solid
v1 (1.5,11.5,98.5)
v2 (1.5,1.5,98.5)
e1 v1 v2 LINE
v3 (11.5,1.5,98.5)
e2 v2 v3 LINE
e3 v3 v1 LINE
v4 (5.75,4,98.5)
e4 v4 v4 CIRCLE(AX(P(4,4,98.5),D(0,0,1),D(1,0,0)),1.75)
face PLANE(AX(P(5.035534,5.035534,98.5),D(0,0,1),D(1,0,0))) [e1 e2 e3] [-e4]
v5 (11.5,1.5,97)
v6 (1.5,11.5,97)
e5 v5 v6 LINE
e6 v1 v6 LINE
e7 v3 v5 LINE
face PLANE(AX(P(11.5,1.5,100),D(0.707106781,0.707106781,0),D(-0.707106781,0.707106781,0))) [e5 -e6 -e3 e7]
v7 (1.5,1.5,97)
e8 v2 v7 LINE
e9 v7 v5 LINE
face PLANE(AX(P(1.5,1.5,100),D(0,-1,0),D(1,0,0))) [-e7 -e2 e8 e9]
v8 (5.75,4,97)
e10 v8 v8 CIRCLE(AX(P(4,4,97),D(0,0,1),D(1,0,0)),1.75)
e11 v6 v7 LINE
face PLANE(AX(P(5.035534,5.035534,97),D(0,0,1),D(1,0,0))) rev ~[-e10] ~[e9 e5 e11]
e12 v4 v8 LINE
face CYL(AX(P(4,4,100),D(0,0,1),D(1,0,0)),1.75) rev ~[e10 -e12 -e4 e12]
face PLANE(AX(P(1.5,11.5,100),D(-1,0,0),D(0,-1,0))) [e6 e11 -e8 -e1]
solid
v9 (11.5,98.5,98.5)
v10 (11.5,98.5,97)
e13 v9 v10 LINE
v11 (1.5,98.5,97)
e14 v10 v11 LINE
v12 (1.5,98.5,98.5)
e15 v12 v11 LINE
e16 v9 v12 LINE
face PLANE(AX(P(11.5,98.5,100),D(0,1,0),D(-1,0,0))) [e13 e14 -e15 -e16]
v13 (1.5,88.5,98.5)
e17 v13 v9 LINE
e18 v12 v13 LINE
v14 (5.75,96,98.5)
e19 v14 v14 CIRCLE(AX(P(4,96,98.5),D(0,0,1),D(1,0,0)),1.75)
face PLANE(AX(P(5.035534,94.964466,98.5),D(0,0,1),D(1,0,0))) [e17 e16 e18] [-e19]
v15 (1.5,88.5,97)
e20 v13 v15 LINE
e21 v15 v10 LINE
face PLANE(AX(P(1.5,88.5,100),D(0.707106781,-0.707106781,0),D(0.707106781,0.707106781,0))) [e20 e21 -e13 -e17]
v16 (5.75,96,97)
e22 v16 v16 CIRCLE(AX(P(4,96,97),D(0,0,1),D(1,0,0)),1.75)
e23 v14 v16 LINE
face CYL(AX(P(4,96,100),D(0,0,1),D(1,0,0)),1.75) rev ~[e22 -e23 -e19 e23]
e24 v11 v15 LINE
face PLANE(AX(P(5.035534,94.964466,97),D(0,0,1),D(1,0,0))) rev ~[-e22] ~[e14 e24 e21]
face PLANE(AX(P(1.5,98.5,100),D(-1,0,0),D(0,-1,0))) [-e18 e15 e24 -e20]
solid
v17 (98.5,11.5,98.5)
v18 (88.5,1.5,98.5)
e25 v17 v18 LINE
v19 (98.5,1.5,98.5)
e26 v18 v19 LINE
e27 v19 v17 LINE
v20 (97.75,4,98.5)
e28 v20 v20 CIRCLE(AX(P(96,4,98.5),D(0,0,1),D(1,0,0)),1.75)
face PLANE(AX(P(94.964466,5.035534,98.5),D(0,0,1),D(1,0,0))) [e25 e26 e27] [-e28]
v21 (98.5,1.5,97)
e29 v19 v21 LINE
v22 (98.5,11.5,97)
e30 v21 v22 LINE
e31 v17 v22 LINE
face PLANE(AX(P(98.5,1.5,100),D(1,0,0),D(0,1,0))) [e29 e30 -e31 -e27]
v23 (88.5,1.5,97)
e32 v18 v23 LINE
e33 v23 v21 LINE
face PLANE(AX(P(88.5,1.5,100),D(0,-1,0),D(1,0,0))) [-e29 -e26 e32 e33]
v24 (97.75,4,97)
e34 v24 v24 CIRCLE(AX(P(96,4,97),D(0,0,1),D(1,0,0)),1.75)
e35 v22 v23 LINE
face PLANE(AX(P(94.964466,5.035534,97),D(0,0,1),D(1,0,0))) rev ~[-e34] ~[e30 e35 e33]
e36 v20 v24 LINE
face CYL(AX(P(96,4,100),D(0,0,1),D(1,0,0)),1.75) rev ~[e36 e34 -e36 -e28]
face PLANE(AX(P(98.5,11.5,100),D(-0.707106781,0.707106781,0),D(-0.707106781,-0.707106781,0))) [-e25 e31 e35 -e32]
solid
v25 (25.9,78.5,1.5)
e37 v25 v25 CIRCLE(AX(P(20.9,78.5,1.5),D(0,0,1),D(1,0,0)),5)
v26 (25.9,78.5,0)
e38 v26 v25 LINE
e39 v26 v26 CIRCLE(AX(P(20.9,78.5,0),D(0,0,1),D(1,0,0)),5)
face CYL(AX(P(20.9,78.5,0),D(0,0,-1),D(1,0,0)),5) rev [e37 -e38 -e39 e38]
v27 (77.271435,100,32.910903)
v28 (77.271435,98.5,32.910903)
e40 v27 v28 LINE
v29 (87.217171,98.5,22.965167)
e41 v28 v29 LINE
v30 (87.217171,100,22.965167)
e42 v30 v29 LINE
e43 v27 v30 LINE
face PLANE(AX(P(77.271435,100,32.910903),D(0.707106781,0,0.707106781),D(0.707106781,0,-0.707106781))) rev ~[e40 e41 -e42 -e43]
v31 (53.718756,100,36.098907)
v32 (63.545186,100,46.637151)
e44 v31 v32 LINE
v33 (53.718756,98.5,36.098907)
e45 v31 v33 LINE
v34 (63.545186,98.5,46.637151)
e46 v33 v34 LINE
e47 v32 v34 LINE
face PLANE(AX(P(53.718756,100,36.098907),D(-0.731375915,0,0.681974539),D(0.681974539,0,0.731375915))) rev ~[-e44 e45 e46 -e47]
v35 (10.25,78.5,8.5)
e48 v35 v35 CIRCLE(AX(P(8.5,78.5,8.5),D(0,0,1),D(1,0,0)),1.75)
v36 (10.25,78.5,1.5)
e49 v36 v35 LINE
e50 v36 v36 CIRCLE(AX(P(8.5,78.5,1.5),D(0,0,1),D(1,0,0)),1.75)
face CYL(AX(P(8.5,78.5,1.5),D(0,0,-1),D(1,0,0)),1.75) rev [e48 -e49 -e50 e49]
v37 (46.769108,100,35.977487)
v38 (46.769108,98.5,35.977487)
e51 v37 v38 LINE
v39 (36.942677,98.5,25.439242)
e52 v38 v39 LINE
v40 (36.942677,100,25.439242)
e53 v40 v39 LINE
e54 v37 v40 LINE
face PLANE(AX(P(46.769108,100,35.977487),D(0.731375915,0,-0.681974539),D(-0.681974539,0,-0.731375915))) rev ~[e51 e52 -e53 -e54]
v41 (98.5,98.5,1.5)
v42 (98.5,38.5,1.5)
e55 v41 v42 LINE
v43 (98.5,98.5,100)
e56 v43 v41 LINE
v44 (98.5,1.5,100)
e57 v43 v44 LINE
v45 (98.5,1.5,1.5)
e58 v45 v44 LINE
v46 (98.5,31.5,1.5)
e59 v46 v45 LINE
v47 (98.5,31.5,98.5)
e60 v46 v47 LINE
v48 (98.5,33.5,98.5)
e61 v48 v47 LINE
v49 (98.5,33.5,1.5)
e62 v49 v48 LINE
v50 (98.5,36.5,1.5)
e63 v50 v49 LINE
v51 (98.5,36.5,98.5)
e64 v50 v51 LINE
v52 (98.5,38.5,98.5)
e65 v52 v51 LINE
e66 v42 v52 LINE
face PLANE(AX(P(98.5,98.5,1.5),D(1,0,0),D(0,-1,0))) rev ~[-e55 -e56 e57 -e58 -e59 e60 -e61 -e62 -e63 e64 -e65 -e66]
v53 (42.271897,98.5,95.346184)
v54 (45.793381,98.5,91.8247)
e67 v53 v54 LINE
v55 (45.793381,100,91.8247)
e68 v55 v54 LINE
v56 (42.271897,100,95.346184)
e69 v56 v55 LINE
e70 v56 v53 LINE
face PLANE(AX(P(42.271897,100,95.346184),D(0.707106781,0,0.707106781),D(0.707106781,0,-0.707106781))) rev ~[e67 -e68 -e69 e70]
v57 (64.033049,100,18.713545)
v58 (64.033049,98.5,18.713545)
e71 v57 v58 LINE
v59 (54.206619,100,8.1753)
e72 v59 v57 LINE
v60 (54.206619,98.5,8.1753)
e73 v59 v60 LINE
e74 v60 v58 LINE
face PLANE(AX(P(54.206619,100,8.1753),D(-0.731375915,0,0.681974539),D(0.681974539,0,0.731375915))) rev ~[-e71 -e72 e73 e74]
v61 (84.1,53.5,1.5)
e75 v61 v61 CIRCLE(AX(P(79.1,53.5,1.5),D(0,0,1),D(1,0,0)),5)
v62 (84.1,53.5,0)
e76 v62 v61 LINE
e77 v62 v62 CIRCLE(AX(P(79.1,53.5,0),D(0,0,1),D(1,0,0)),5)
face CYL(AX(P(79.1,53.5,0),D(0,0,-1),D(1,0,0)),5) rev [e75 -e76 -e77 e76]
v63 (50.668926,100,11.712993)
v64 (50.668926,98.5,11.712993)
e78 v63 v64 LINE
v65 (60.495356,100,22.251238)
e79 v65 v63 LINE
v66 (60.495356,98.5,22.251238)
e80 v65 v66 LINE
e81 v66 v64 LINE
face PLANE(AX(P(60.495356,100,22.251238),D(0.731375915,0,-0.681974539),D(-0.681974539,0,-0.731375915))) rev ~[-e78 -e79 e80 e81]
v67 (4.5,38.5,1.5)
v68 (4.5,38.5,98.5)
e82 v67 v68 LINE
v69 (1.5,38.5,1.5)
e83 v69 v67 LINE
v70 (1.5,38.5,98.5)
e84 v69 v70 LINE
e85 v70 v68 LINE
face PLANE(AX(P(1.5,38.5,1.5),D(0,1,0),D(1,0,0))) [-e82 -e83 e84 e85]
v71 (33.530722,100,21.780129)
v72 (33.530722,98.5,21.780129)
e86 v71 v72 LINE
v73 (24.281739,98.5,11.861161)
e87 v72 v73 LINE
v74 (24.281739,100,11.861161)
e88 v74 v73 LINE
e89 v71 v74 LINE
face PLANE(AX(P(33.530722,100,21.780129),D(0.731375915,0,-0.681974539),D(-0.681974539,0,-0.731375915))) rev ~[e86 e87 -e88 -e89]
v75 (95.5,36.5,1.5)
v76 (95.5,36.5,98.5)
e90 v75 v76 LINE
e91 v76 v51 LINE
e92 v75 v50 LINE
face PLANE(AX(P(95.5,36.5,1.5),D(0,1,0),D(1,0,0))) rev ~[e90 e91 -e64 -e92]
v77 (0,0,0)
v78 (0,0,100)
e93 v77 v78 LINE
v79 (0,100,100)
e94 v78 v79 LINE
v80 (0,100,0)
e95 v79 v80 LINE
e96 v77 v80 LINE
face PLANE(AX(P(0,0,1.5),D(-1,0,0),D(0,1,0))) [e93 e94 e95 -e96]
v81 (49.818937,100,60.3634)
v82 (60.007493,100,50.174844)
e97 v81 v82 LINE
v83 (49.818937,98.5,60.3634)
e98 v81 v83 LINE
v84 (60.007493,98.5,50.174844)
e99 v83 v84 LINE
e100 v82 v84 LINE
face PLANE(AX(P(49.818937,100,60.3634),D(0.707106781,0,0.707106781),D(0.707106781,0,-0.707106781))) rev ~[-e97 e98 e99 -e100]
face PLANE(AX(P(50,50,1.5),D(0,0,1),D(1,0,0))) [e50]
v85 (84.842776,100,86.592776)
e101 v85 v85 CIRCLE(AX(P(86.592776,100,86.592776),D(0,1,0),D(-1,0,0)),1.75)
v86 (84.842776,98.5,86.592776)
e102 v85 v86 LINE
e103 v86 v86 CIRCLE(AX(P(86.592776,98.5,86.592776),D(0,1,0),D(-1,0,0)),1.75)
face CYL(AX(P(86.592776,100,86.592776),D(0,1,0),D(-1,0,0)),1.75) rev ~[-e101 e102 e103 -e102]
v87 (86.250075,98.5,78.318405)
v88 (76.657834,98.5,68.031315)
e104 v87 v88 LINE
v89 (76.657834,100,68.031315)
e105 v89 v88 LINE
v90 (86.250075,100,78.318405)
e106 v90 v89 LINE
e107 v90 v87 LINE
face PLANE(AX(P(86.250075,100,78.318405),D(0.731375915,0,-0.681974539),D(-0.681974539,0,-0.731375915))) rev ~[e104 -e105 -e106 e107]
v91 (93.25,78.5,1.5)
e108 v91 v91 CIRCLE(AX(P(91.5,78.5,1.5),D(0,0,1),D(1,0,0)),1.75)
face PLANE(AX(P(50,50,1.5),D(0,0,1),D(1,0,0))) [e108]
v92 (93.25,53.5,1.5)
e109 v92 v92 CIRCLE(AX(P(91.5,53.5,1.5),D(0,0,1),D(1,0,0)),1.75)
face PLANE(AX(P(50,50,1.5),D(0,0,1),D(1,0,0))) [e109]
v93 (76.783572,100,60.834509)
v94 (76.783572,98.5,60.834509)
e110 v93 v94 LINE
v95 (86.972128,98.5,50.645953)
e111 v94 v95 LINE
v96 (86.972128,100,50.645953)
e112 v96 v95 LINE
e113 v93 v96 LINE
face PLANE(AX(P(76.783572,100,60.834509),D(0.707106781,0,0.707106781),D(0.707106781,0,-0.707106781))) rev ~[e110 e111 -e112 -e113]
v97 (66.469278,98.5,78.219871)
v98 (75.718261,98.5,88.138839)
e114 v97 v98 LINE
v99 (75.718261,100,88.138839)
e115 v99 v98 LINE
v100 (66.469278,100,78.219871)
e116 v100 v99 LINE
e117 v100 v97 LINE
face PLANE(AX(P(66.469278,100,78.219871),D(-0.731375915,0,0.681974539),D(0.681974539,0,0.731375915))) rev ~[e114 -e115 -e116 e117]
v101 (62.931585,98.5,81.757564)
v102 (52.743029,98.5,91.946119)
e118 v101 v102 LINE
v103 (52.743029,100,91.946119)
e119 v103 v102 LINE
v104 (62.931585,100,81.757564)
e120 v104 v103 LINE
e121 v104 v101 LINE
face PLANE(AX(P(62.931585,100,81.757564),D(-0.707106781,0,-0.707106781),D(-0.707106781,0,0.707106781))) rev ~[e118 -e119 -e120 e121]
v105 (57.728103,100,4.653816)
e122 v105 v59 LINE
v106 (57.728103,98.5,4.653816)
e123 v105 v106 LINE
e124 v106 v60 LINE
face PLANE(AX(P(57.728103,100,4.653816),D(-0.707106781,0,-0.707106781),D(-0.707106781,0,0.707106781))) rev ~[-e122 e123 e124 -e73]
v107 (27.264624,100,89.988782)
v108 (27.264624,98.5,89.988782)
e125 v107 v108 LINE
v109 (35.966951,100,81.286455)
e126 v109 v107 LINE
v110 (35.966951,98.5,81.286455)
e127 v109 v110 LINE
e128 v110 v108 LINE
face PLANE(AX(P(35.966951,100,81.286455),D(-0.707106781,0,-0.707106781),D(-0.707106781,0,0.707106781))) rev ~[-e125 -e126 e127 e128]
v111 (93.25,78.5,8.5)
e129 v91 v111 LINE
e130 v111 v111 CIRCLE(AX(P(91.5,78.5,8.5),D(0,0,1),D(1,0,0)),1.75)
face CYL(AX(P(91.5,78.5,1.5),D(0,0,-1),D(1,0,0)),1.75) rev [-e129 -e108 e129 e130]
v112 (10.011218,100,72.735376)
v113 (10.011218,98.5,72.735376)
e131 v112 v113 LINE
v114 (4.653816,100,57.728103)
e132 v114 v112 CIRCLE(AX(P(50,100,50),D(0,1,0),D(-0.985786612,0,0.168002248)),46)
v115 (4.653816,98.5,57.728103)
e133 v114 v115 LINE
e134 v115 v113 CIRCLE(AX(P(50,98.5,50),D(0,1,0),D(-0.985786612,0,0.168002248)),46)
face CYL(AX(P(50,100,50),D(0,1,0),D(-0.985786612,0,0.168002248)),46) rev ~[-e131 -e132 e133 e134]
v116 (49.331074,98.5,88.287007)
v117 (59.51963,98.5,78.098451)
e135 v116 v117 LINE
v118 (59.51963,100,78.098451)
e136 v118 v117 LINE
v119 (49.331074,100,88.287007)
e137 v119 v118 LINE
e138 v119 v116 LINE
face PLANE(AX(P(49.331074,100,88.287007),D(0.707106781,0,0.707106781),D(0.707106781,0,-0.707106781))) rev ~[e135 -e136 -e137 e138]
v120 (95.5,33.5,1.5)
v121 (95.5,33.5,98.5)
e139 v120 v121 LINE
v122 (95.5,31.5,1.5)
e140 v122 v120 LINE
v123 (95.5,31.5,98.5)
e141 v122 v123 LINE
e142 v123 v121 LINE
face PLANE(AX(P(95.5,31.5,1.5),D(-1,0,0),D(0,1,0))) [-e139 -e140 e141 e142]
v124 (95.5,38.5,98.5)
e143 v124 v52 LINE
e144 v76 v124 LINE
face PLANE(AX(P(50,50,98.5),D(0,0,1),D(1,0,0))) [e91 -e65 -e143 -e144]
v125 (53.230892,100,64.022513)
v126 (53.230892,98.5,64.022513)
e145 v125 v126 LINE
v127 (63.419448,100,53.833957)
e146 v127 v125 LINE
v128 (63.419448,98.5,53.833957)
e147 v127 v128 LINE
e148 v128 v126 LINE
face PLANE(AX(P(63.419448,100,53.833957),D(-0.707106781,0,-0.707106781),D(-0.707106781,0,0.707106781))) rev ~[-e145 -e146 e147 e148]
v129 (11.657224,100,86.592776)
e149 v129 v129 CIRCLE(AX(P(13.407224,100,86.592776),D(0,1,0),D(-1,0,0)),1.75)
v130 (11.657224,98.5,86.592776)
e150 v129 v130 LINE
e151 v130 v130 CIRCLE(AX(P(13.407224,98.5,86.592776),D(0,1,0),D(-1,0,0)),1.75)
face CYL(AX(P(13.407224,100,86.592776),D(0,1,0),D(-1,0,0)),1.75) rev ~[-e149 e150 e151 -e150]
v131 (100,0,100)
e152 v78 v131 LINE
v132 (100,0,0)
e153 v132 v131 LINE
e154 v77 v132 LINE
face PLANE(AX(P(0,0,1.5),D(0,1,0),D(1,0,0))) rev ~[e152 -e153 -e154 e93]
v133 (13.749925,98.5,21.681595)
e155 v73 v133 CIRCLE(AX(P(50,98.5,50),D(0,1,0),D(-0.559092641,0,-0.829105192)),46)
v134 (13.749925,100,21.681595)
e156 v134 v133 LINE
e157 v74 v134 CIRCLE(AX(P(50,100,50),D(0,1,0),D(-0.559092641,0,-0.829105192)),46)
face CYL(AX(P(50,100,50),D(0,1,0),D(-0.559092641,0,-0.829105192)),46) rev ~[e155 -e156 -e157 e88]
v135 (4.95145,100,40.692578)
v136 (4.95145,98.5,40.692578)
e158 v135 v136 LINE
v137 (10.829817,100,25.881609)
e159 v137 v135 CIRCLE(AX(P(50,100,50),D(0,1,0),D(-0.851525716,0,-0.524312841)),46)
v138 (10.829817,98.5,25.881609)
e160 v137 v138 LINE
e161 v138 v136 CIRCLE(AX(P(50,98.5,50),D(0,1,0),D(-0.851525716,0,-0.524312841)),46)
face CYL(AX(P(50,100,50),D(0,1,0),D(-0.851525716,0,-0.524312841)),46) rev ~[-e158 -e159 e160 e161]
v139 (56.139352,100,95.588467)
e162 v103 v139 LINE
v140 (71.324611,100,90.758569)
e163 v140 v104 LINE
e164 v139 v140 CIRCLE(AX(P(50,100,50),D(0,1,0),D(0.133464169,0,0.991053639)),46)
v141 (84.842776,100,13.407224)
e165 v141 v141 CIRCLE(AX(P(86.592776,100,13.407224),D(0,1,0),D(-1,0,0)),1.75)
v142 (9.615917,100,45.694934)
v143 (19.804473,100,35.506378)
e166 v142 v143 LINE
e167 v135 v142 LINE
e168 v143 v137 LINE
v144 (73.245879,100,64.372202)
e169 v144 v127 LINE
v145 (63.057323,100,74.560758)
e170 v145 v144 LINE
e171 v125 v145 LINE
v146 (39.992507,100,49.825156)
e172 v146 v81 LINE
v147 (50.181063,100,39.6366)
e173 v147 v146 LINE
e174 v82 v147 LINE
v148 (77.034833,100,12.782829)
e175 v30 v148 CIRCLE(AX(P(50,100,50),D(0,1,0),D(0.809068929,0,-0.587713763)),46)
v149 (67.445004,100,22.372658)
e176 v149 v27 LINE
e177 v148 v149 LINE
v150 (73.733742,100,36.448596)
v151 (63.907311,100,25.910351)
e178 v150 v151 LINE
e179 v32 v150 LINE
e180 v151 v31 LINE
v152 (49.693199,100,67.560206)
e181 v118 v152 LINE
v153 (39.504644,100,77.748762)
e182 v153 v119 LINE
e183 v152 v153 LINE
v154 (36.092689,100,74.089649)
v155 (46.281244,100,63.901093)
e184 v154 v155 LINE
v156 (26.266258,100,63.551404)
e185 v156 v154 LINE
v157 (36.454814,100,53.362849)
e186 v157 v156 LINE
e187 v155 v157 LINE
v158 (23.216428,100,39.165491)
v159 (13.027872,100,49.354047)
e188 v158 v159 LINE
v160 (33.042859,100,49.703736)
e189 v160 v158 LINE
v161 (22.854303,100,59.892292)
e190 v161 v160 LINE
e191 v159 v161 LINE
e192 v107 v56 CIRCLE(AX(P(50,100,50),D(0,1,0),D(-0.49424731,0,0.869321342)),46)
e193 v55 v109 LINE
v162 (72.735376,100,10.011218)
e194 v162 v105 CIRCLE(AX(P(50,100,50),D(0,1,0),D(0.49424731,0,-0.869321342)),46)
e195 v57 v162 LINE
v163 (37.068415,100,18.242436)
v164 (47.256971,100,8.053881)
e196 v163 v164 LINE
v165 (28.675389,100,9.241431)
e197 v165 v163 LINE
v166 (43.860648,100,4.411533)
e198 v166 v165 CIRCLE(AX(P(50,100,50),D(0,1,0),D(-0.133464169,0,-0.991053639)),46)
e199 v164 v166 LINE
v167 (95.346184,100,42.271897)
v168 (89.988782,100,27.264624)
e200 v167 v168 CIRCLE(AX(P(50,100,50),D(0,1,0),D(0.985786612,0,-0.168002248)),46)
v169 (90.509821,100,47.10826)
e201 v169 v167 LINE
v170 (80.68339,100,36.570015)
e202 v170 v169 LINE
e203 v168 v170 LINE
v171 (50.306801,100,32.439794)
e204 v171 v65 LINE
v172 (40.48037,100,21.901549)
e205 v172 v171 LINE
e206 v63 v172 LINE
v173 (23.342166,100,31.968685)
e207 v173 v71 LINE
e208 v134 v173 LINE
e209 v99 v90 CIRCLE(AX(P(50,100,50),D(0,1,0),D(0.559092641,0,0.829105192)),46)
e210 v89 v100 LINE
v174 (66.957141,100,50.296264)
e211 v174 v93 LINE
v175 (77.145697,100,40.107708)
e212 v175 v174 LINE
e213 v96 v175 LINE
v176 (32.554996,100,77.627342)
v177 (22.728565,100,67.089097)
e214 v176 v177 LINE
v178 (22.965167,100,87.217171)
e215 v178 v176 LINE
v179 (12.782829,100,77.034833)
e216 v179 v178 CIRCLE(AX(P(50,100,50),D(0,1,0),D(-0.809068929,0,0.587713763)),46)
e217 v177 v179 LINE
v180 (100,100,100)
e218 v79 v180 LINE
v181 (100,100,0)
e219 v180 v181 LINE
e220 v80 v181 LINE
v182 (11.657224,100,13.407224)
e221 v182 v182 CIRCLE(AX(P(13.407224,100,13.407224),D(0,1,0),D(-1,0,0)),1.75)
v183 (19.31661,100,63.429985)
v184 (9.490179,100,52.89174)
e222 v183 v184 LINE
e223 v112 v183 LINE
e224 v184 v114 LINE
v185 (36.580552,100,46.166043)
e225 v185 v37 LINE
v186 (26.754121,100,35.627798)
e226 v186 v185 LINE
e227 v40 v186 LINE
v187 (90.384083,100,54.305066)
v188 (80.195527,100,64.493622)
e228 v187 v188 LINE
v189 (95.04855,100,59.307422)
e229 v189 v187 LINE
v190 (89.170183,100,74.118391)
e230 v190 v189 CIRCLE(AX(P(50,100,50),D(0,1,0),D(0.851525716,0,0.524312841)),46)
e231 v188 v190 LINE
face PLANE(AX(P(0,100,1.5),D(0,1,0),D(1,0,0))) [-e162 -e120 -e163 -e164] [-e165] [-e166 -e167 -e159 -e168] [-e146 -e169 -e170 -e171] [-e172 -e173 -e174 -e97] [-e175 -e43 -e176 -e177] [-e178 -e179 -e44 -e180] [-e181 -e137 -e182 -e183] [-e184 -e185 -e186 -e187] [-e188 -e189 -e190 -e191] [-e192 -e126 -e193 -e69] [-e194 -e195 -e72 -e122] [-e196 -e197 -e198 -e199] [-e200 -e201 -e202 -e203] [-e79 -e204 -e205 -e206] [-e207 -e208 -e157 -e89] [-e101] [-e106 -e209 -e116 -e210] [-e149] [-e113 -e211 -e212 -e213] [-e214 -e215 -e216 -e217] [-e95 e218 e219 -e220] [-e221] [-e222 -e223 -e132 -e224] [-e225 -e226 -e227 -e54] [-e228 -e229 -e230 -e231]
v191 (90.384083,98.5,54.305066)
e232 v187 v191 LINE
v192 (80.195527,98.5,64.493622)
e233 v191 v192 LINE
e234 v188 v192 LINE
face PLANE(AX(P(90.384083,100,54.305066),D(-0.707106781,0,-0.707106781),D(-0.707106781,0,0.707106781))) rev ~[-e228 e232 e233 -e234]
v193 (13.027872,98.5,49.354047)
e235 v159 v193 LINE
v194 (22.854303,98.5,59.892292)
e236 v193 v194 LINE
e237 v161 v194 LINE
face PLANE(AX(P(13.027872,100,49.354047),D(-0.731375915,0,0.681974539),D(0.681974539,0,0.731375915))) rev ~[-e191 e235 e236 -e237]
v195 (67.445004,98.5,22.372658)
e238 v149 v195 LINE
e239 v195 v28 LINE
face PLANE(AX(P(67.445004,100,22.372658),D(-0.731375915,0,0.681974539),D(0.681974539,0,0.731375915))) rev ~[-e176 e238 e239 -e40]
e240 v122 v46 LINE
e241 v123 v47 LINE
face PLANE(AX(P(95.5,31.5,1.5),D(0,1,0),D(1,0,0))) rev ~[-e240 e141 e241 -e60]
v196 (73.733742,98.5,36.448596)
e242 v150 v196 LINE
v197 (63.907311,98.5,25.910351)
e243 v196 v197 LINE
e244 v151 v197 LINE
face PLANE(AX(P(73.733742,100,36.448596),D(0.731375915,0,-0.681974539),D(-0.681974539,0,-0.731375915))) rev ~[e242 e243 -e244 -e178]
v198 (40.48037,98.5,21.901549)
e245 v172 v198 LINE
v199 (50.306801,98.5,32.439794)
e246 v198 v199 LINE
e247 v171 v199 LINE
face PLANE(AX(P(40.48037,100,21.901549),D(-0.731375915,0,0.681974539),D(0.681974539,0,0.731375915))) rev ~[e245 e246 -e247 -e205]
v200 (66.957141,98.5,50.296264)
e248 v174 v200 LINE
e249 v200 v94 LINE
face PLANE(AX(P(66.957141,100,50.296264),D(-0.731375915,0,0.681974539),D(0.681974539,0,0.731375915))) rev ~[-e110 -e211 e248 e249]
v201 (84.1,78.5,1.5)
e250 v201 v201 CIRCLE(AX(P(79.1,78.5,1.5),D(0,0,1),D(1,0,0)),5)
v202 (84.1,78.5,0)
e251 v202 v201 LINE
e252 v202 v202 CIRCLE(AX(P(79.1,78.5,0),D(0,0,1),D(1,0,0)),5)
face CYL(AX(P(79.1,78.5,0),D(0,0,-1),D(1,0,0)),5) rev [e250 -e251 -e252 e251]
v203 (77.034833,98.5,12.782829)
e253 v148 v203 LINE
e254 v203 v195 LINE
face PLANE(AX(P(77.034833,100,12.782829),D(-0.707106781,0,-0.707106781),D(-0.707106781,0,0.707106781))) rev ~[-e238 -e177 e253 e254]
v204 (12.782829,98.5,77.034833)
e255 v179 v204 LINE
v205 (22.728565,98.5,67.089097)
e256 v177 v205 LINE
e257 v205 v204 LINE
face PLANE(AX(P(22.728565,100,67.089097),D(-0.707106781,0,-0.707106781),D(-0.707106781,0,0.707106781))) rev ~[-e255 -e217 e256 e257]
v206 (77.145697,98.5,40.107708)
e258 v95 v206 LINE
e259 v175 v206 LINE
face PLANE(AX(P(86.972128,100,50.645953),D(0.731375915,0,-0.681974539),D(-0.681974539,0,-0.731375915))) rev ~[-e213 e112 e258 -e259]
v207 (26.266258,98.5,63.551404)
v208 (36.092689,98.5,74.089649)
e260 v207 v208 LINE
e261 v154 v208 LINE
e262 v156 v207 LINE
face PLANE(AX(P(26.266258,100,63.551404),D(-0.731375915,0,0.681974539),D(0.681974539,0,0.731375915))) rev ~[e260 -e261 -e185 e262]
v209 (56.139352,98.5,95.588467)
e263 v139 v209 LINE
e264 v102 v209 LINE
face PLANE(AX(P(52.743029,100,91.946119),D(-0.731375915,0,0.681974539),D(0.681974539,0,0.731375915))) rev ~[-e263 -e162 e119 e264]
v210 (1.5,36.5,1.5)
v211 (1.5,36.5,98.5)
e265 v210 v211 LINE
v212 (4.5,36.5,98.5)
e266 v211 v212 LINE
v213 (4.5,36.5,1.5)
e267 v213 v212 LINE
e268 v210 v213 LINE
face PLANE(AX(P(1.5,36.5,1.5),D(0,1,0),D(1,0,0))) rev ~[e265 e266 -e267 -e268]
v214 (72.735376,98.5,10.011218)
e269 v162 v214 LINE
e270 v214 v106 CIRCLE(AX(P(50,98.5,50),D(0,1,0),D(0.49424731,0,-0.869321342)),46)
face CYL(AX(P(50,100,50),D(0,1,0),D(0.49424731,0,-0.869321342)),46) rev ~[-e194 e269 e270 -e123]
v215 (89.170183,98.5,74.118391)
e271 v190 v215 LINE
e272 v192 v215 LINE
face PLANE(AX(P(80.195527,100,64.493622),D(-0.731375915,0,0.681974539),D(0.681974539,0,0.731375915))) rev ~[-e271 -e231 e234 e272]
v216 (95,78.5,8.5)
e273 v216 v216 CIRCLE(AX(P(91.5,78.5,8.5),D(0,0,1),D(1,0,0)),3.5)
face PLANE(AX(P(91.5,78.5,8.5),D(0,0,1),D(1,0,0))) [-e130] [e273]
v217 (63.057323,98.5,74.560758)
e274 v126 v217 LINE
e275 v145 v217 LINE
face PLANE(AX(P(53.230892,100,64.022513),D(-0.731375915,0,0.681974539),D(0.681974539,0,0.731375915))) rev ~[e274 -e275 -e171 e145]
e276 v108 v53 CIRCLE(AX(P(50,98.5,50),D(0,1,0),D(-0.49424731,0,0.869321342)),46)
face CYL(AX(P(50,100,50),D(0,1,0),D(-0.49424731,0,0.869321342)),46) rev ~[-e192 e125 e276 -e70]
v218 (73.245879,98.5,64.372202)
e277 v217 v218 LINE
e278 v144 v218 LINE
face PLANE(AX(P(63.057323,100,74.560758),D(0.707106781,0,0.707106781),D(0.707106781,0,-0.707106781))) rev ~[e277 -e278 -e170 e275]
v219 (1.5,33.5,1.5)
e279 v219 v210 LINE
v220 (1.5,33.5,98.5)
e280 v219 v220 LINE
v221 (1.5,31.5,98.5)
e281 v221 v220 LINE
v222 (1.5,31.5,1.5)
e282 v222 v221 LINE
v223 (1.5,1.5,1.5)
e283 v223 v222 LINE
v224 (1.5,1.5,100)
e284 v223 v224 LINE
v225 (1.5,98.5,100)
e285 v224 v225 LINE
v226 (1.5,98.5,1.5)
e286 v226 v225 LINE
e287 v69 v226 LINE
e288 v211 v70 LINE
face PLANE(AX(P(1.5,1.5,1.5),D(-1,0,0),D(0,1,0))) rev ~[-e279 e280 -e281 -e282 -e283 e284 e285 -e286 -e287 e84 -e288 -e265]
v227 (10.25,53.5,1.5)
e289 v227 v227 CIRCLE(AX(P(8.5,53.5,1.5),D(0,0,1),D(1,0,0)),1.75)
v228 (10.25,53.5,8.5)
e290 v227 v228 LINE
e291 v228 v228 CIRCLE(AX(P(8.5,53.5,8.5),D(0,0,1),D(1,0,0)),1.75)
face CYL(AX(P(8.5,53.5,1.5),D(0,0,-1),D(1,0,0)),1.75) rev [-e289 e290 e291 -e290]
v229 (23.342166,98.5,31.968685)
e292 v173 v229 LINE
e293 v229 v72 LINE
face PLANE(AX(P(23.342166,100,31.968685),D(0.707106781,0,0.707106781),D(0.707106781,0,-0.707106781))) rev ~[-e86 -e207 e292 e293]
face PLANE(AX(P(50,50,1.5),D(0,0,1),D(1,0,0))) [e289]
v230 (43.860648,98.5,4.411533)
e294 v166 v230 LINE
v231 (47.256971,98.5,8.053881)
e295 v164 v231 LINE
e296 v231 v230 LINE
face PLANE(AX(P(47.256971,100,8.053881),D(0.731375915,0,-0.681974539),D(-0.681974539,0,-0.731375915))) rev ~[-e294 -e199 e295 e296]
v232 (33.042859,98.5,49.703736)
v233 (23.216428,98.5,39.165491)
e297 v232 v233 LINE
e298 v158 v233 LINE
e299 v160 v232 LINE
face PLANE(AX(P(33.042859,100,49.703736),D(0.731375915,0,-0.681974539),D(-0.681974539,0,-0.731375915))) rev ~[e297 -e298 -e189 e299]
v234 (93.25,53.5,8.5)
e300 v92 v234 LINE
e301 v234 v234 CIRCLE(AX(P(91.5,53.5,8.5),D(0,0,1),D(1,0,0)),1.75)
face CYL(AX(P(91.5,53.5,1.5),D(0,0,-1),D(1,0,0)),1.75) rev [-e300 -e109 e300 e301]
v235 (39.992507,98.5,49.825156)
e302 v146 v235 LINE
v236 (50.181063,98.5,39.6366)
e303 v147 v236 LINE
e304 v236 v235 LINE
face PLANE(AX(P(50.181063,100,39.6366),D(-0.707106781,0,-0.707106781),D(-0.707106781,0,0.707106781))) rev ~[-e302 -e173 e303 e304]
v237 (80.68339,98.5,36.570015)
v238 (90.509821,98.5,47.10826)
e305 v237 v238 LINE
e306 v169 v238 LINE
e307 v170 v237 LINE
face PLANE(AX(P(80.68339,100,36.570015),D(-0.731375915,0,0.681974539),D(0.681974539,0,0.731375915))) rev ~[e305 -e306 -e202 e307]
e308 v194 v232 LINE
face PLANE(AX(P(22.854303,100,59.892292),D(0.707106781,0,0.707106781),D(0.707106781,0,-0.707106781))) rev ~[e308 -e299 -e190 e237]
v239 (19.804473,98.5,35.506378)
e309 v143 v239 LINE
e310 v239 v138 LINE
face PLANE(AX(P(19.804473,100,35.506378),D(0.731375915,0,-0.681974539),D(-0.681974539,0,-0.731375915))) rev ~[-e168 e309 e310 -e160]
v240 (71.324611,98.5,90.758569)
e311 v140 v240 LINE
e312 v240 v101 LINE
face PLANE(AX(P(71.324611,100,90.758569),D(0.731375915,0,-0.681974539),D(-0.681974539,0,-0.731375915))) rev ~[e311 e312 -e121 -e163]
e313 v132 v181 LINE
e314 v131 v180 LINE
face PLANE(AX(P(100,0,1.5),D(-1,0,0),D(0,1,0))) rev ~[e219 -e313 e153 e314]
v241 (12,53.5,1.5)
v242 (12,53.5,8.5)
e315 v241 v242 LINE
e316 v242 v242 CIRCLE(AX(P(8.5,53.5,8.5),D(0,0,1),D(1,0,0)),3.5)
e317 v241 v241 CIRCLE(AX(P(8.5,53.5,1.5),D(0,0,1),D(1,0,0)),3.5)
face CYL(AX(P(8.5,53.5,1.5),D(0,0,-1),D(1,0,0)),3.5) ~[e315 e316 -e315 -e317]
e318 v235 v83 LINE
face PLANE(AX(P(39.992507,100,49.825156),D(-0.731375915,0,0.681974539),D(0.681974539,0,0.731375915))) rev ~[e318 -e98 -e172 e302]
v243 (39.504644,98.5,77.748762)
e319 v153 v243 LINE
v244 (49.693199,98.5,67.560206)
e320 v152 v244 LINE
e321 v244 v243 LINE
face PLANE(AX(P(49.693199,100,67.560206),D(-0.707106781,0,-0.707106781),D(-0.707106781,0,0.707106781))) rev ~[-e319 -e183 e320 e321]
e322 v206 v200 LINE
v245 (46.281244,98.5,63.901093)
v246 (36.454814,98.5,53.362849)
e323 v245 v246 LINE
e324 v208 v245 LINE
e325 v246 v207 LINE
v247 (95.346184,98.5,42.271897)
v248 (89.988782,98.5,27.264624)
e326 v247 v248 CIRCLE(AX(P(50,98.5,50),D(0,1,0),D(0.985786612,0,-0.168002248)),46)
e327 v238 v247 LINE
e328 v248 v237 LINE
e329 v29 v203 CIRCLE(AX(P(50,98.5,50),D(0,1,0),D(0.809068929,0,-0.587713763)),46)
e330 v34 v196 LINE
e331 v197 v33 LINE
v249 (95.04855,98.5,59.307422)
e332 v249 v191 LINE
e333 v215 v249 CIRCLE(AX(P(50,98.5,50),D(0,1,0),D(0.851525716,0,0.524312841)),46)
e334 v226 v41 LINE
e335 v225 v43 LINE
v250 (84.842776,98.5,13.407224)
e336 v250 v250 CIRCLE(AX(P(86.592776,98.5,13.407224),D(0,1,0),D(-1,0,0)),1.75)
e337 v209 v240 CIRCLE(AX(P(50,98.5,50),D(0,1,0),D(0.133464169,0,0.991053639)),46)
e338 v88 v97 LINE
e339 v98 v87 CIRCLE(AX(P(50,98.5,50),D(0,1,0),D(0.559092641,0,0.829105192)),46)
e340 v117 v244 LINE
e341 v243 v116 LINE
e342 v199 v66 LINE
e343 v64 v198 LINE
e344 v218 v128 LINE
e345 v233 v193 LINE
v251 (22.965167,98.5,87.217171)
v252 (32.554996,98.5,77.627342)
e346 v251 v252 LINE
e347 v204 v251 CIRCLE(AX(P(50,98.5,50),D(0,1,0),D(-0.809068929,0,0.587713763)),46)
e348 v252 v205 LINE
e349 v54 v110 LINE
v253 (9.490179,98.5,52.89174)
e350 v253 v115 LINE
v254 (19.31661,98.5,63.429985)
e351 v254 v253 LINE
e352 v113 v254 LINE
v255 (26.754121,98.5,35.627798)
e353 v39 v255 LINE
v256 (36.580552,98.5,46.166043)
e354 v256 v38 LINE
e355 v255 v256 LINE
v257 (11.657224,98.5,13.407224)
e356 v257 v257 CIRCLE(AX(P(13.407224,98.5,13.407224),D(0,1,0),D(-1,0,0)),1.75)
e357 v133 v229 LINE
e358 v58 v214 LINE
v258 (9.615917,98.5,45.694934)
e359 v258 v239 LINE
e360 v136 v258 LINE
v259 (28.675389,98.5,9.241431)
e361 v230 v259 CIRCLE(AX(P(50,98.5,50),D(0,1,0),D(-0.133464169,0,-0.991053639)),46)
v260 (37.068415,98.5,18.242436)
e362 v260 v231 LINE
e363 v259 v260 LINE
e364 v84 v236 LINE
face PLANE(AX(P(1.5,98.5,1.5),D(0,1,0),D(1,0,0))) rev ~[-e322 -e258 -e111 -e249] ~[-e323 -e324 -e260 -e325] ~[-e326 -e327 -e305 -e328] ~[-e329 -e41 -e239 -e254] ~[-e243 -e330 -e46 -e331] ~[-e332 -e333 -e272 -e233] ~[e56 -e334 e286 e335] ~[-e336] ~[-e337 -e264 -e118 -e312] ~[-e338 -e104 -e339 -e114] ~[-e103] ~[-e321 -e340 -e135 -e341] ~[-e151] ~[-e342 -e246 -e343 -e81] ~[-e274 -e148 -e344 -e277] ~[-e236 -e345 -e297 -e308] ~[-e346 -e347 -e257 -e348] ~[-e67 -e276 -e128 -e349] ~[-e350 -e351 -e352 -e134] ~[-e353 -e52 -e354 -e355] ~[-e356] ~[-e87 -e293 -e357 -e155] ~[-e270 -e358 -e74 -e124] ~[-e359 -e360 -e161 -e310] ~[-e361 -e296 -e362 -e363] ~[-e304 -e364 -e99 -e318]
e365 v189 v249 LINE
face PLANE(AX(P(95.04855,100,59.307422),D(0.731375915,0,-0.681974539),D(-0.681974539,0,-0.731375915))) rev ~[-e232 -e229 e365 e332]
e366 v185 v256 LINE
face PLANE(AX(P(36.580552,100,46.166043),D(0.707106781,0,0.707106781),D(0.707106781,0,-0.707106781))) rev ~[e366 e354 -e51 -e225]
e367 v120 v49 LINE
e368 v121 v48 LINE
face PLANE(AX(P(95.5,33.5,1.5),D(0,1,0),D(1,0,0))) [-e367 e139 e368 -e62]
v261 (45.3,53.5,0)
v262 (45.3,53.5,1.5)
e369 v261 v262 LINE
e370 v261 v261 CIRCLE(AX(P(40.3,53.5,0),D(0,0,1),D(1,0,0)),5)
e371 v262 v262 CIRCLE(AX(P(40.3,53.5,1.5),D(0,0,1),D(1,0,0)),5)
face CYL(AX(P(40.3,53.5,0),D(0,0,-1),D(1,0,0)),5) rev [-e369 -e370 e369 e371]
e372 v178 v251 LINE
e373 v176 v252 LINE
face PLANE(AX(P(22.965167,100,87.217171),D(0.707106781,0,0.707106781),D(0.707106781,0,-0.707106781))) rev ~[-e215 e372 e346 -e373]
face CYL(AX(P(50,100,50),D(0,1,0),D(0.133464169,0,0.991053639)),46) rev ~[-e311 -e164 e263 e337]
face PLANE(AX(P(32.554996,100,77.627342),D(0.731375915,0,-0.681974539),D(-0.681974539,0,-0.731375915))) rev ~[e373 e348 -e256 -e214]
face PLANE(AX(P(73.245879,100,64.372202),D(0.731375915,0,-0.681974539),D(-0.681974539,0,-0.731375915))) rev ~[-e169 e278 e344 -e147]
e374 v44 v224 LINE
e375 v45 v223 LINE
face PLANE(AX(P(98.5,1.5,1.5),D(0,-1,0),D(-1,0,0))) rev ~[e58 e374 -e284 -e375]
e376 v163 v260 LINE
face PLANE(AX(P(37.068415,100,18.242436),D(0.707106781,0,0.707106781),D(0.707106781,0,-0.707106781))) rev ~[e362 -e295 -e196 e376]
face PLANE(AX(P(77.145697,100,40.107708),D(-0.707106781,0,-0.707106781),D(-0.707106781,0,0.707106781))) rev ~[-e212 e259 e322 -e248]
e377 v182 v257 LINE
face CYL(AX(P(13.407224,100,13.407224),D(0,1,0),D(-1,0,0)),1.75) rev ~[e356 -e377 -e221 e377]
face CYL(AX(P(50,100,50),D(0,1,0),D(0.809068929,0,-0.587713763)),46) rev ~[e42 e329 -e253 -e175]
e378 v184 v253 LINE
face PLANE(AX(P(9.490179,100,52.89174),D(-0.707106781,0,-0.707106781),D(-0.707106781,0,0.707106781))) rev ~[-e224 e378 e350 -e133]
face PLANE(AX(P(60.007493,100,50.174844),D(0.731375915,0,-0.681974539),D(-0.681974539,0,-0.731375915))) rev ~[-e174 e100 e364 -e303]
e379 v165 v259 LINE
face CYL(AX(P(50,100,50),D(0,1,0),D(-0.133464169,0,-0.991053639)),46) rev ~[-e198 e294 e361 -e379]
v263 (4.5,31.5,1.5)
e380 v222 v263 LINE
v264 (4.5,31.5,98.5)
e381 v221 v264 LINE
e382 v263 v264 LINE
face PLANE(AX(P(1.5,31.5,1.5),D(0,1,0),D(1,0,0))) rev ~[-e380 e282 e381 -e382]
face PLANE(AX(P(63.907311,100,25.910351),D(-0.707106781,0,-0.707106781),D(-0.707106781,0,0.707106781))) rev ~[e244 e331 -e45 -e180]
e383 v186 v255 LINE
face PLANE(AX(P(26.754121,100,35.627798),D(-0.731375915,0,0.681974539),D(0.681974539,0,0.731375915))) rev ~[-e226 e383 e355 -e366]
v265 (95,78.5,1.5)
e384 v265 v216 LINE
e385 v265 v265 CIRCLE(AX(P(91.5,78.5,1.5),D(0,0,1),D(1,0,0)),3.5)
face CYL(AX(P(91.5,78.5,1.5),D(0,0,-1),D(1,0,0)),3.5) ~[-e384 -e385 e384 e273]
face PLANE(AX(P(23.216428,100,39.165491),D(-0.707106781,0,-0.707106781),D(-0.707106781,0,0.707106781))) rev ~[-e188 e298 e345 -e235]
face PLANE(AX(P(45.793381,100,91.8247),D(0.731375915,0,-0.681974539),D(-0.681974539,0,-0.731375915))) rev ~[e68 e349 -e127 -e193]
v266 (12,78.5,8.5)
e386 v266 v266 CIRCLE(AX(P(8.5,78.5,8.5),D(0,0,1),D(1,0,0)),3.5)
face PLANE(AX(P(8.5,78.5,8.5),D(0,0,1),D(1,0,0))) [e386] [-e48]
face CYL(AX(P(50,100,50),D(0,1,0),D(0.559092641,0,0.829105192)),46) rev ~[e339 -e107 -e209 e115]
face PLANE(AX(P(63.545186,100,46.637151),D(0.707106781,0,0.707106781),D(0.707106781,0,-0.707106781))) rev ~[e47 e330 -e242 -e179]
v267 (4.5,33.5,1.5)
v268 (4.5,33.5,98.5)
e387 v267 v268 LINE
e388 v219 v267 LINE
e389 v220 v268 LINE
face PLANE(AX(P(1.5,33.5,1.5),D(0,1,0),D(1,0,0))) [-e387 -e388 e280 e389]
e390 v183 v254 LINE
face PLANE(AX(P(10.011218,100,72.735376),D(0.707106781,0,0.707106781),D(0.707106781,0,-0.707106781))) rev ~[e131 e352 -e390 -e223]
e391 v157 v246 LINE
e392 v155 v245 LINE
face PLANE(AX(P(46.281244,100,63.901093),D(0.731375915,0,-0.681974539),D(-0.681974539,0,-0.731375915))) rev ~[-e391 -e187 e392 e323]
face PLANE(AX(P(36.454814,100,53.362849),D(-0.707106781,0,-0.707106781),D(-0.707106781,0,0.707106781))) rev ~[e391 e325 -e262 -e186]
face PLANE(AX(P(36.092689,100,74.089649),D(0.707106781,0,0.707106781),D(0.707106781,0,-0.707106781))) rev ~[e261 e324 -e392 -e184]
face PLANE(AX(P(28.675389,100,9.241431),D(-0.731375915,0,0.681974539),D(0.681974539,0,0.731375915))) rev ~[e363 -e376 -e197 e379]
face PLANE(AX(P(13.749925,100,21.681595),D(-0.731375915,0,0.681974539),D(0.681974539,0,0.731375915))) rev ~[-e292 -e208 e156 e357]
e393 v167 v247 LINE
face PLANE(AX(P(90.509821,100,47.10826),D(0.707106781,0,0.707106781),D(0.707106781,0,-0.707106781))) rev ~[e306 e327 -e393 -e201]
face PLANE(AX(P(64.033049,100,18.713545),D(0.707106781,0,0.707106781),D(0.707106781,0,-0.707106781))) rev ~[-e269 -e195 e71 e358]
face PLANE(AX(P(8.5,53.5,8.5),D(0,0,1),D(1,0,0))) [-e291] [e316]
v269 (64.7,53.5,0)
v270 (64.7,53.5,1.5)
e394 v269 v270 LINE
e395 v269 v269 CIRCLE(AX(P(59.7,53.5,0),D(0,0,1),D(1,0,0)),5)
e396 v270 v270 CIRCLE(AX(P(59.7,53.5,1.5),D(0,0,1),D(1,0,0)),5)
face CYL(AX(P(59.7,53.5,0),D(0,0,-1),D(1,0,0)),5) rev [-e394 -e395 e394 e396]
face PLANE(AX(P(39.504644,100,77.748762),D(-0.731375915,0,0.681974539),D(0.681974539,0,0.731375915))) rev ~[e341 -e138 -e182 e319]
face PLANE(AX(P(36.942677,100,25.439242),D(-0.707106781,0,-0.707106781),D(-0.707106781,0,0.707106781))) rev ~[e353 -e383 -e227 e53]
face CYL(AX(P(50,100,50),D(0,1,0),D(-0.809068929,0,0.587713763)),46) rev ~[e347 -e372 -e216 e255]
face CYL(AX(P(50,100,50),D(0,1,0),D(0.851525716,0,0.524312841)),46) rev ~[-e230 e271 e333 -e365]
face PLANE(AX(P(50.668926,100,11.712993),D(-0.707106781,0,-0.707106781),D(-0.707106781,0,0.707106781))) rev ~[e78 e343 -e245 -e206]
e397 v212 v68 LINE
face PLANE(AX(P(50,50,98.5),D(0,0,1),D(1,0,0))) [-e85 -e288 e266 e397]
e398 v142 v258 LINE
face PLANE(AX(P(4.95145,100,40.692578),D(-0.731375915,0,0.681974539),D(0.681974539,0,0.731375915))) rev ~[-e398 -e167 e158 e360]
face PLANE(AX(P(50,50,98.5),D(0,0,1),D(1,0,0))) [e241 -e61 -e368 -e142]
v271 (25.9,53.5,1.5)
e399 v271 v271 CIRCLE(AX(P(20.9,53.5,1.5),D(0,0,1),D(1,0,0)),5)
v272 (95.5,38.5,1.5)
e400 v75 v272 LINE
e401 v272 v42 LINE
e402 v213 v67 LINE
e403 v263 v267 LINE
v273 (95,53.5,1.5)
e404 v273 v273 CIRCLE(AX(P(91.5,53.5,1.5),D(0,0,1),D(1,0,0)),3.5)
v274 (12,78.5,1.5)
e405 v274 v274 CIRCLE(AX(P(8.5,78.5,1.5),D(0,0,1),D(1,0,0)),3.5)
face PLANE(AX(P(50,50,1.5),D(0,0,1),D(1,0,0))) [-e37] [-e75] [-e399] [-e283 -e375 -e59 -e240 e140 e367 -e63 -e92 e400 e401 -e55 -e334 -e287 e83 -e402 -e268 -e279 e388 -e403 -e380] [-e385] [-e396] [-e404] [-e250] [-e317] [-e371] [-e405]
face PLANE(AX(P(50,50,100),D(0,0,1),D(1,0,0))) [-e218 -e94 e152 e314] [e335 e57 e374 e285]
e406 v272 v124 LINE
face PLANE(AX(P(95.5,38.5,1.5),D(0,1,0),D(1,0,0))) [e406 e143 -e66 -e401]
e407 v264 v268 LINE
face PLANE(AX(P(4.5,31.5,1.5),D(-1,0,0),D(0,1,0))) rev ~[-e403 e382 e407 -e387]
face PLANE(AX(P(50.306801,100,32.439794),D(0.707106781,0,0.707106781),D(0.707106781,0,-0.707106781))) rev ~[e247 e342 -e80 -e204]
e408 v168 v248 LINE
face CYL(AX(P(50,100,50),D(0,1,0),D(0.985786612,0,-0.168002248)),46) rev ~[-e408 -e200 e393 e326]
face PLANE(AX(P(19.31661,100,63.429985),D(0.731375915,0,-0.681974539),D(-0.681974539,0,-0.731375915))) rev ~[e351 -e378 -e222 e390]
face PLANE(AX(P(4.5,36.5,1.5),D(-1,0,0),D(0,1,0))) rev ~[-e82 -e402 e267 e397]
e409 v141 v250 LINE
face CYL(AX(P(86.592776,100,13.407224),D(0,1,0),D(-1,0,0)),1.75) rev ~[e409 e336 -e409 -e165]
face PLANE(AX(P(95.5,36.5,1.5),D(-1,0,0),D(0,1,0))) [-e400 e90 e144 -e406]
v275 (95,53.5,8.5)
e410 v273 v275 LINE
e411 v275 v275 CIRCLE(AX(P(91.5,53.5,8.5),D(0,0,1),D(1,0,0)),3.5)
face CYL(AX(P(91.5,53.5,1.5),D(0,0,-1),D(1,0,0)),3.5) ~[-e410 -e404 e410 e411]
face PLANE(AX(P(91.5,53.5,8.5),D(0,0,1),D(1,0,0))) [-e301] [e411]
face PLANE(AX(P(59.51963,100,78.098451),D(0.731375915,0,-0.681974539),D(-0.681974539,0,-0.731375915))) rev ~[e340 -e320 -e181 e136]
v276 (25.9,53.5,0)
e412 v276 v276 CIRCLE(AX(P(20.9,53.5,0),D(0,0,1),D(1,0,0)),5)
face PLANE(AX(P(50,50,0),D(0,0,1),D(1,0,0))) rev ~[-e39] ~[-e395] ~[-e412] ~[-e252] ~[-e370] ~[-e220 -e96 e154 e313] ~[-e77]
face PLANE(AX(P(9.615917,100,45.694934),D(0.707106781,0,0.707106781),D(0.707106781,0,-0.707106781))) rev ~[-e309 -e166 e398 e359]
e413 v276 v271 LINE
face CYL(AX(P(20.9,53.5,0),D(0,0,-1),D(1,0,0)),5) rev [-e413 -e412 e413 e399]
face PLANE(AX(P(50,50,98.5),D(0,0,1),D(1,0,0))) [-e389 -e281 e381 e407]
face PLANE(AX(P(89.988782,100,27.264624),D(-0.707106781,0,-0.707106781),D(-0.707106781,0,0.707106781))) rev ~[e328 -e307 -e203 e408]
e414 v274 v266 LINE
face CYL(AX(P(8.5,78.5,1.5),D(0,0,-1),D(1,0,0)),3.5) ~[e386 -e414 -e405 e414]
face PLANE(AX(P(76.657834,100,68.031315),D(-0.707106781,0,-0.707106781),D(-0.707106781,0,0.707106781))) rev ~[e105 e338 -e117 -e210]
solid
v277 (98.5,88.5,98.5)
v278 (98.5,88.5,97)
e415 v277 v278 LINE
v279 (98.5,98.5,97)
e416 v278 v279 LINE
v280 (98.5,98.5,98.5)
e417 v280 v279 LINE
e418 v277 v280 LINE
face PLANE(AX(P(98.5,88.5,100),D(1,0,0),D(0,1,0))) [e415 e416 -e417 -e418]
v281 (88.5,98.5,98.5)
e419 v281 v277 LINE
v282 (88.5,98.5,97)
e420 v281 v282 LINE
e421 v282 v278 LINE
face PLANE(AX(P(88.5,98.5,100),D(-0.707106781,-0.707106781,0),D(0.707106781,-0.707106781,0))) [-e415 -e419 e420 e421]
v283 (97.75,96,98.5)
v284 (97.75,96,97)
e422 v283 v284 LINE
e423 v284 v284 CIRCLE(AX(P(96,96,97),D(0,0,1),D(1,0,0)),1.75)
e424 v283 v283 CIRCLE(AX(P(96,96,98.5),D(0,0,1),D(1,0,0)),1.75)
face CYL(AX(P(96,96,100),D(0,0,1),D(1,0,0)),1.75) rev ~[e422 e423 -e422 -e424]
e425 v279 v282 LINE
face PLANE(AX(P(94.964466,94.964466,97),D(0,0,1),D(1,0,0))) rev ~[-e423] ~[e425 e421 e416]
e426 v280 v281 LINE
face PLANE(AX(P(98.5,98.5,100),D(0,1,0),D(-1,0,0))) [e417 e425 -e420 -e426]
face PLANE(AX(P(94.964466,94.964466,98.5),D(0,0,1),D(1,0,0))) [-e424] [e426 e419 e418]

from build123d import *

# Parameters (mm, degrees)
F0_W      = 100
F0_H      = 100
F0_R      = 5
F0_W_2    = 3
F0_H_2    = 2
F1_DEPTH  = 1.5
F2_W      = 100
F2_H      = 100
F3_DEPTH  = 98.5
F2_W_2    = 3
F2_H_2    = 2
F4_DEPTH  = 97
F5_R      = 1.75
F6_DEPTH  = 1.5
F7_R      = 1.75
F8_DEPTH  = 3
F8_FACE_R = 1.75
F9_DEPTH  = 1.5
F2_R      = 3.5
F2_R_2    = 1.75
F10_DEPTH = 7


with BuildPart() as f1:
    # F0 (on Top) → F1 (new body)
    with BuildSketch(Plane.XY):
        with Locations((50, 50)):
            Rectangle(F0_W, F0_H)
        Polygon((98.5, 1.5), (1.5, 1.5), (1.5, 31.5), (1.5, 33.5), (1.5, 36.5), (1.5, 38.5), (1.5, 98.5), (98.5, 98.5), (98.5, 38.5), (98.5, 36.5), (98.5, 33.5), (98.5, 31.5), align=None, mode=Mode.SUBTRACT)
        Polygon((1.5, 31.5), (1.5, 1.5), (98.5, 1.5), (98.5, 31.5), (95.5, 31.5), (95.5, 33.5), (98.5, 33.5), (98.5, 36.5), (95.5, 36.5), (95.5, 38.5), (98.5, 38.5), (98.5, 98.5), (1.5, 98.5), (1.5, 38.5), (4.5, 38.5), (4.5, 36.5), (1.5, 36.5), (1.5, 33.5), (4.5, 33.5), (4.5, 31.5), align=None)
        with Locations((20.9, 53.5)):
            Circle(F0_R, mode=Mode.SUBTRACT)
        with Locations((40.3, 53.5)):
            Circle(F0_R, mode=Mode.SUBTRACT)
        with Locations((20.9, 78.5)):
            Circle(F0_R, mode=Mode.SUBTRACT)
        with Locations((59.7, 53.5)):
            Circle(F0_R, mode=Mode.SUBTRACT)
        with Locations((79.1, 53.5)):
            Circle(F0_R, mode=Mode.SUBTRACT)
        with Locations((79.1, 78.5)):
            Circle(F0_R, mode=Mode.SUBTRACT)
        with Locations((3, 37.5)):
            Rectangle(F0_W_2, F0_H_2)
        with Locations((3, 32.5)):
            Rectangle(F0_W_2, F0_H_2)
        with Locations((97, 37.5)):
            Rectangle(F0_W_2, F0_H_2)
        with Locations((97, 32.5)):
            Rectangle(F0_W_2, F0_H_2)
    extrude(amount=F1_DEPTH)

    # F2 (on face) → F3 (join)
    with BuildSketch(Plane.XY.offset(1.5)):
        with Locations((50, 50)):
            Rectangle(F2_W, F2_H)
        Polygon((98.5, 1.5), (1.5, 1.5), (1.5, 31.5), (1.5, 33.5), (1.5, 36.5), (1.5, 38.5), (1.5, 98.5), (98.5, 98.5), (98.5, 38.5), (98.5, 36.5), (98.5, 33.5), (98.5, 31.5), align=None, mode=Mode.SUBTRACT)
    extrude(amount=F3_DEPTH)

    # F2 (on face) → F4 (join)
    with BuildSketch(Plane.XY.offset(1.5)):
        with Locations((50, 50)):
            Rectangle(F2_W, F2_H)
        Polygon((98.5, 1.5), (1.5, 1.5), (1.5, 31.5), (1.5, 33.5), (1.5, 36.5), (1.5, 38.5), (1.5, 98.5), (98.5, 98.5), (98.5, 38.5), (98.5, 36.5), (98.5, 33.5), (98.5, 31.5), align=None, mode=Mode.SUBTRACT)
        with Locations((3, 37.5)):
            Rectangle(F2_W_2, F2_H_2)
        with Locations((3, 32.5)):
            Rectangle(F2_W_2, F2_H_2)
        with Locations((97, 37.5)):
            Rectangle(F2_W_2, F2_H_2)
        with Locations((97, 32.5)):
            Rectangle(F2_W_2, F2_H_2)
    extrude(amount=F4_DEPTH)

    # F5 (on face) → F6 (cut)
    with BuildSketch(Plane(origin=(0, 100, 0), x_dir=(-1, 0, 0), z_dir=(0, 1, 0))):
        with BuildLine():
            Line((-9.4901794257, 52.8917398152), (-4.6538158404, 57.7281034004))
            ThreePointArc((-4.6538158404, 57.7281034004), (-6.6777348094, 65.4654886362), (-10.0112182568, 72.7353762822))
            Line((-10.0112182568, 72.7353762822), (-19.3166099549, 63.4299845841))
            Line((-19.3166099549, 63.4299845841), (-9.4901794257, 52.8917398152))
        make_face()
        with BuildLine():
            ThreePointArc((-10.8298170716, 25.8816093125), (-7.24441602, 33.0306146685), (-4.9514495581, 40.6925780646))
            Line((-4.9514495581, 40.6925780646), (-9.615917377, 45.694934052))
            Line((-9.615917377, 45.694934052), (-19.8044732059, 35.5063782232))
            Line((-19.8044732059, 35.5063782232), (-10.8298170716, 25.8816093125))
        make_face()
        with BuildLine():
            Line((-22.7285649998, 67.0890973511), (-12.7828292456, 77.0348331054))
            ThreePointArc((-12.7828292456, 77.0348331054), (-17.4730880654, 82.5269119346), (-22.9651668946, 87.2171707544))
            Line((-22.9651668946, 87.2171707544), (-32.554995529, 77.62734212))
            Line((-32.554995529, 77.62734212), (-22.7285649998, 67.0890973511))
        make_face()
        Polygon((-23.2164282507, 39.1654909901), (-13.0278724219, 49.354046819), (-22.8543029511, 59.892291588), (-33.04285878, 49.7037357591), align=None)
        with BuildLine():
            ThreePointArc((-24.2817385198, 11.8611611814), (-18.6291712168, 16.3567079278), (-13.7499253493, 21.6815945396))
            Line((-13.7499253493, 21.6815945396), (-23.342166202, 31.968685227))
            Line((-23.342166202, 31.968685227), (-33.5307220309, 21.7801293981))
            Line((-33.5307220309, 21.7801293981), (-24.2817385198, 11.8611611814))
        make_face()
        with BuildLine():
            Line((-35.9669505739, 81.286454887), (-27.2646237178, 89.9887817432))
            ThreePointArc((-27.2646237178, 89.9887817432), (-34.5345113638, 93.3222651906), (-42.2718965996, 95.3461841596))
            Line((-42.2718965996, 95.3461841596), (-45.7933811031, 91.824699656))
            Line((-45.7933811031, 91.824699656), (-35.9669505739, 81.286454887))
        make_face()
        Polygon((-36.4548138248, 53.3628485261), (-26.266257996, 63.551404355), (-36.0926885252, 74.0896491239), (-46.281244354, 63.901093295), align=None)
        Polygon((-36.9426770757, 25.4392421651), (-26.7541212469, 35.627797994), (-36.5805517761, 46.166042763), (-46.769107605, 35.9774869341), align=None)
        with BuildLine():
            ThreePointArc((-43.8606482155, 4.4115326024), (-36.0572855508, 6.1639336415), (-28.6753893881, 9.2414305667))
            Line((-28.6753893881, 9.2414305667), (-37.068415027, 18.242436402))
            Line((-37.068415027, 18.242436402), (-47.2569708559, 8.0538805731))
            Line((-47.2569708559, 8.0538805731), (-43.8606482155, 4.4115326024))
        make_face()
        Polygon((-49.6931993989, 67.560206062), (-39.50464357, 77.7487618909), (-49.3310740993, 88.2870066599), (-59.5196299281, 78.098450831), align=None)
        Polygon((-50.1810626498, 39.6365997011), (-39.992506821, 49.82515553), (-49.8189373502, 60.3634002989), (-60.007493179, 50.17484447), align=None)
        Polygon((-50.6689259007, 11.7129933401), (-40.4803700719, 21.901549169), (-50.3068006011, 32.439793938), (-60.49535643, 22.2512381091), align=None)
        with BuildLine():
            Line((-52.7430291441, 91.9461194269), (-56.1393517845, 95.5884673976))
            ThreePointArc((-56.1393517845, 95.5884673976), (-63.9427144492, 93.8360663585), (-71.3246106119, 90.7585694333))
            Line((-71.3246106119, 90.7585694333), (-62.931584973, 81.757563598))
            Line((-62.931584973, 81.757563598), (-52.7430291441, 91.9461194269))
        make_face()
        Polygon((-63.4194482239, 53.833957237), (-53.230892395, 64.0225130659), (-63.0573229243, 74.5607578349), (-73.2458787531, 64.372202006), align=None)
        Polygon((-63.9073114748, 25.9103508761), (-53.718755646, 36.098906705), (-63.5451861752, 46.6371514739), (-73.733742004, 36.448595645), align=None)
        with BuildLine():
            Line((-57.7281034004, 4.6538158404), (-54.2066188969, 8.175300344))
            Line((-54.2066188969, 8.175300344), (-64.0330494261, 18.713545113))
            Line((-64.0330494261, 18.713545113), (-72.7353762822, 10.0112182568))
            ThreePointArc((-72.7353762822, 10.0112182568), (-65.4654886362, 6.6777348094), (-57.7281034004, 4.6538158404))
        make_face()
        with BuildLine():
            Line((-66.4692779691, 78.2198706019), (-75.7182614802, 88.1388388186))
            ThreePointArc((-75.7182614802, 88.1388388186), (-81.3708287832, 83.6432920722), (-86.2500746507, 78.3184054604))
            Line((-86.2500746507, 78.3184054604), (-76.657833798, 68.031314773))
            Line((-76.657833798, 68.031314773), (-66.4692779691, 78.2198706019))
        make_face()
        Polygon((-77.1456970489, 40.107708412), (-66.95714122, 50.2962642409), (-76.7835717493, 60.8345090099), (-86.9721275781, 50.645953181), align=None)
        with BuildLine():
            Line((-77.0348331054, 12.7828292456), (-67.445004471, 22.37265788))
            Line((-67.445004471, 22.37265788), (-77.2714350002, 32.9109026489))
            Line((-77.2714350002, 32.9109026489), (-87.2171707544, 22.9651668946))
            ThreePointArc((-87.2171707544, 22.9651668946), (-82.5269119346, 17.4730880654), (-77.0348331054, 12.7828292456))
        make_face()
        with BuildLine():
            Line((-80.1955267941, 64.4936217768), (-89.1701829284, 74.1183906875))
            ThreePointArc((-89.1701829284, 74.1183906875), (-92.75558398, 66.9693853315), (-95.0485504419, 59.3074219354))
            Line((-95.0485504419, 59.3074219354), (-90.384082623, 54.305065948))
            Line((-90.384082623, 54.305065948), (-80.1955267941, 64.4936217768))
        make_face()
        with BuildLine():
            Line((-89.9887817432, 27.2646237178), (-80.6833900451, 36.5700154159))
            Line((-80.6833900451, 36.5700154159), (-90.5098205743, 47.1082601848))
            Line((-90.5098205743, 47.1082601848), (-95.3461841596, 42.2718965996))
            ThreePointArc((-95.3461841596, 42.2718965996), (-93.3222651906, 34.5345113638), (-89.9887817432, 27.2646237178))
        make_face()
        with Locations((-13.4072240736, 86.5927759264)):
            Circle(F5_R)
        with Locations((-86.5927759264, 86.5927759264)):
            Circle(F5_R)
        with Locations((-86.5927759264, 13.4072240736)):
            Circle(F5_R)
        with Locations((-13.4072240736, 13.4072240736)):
            Circle(F5_R)
    extrude(amount=-F6_DEPTH, mode=Mode.SUBTRACT)

    # F2 (on face) → F10 (join)
    with BuildSketch(Plane.XY.offset(1.5)):
        with Locations((8.5, 78.5)):
            Circle(F2_R)
        with Locations((8.5, 78.5)):
            Circle(F2_R_2, mode=Mode.SUBTRACT)
        with Locations((91.5, 78.5)):
            Circle(F2_R)
        with Locations((91.5, 78.5)):
            Circle(F2_R_2, mode=Mode.SUBTRACT)
        with Locations((91.5, 53.5)):
            Circle(F2_R)
        with Locations((91.5, 53.5)):
            Circle(F2_R_2, mode=Mode.SUBTRACT)
        with Locations((8.5, 53.5)):
            Circle(F2_R)
        with Locations((8.5, 53.5)):
            Circle(F2_R_2, mode=Mode.SUBTRACT)
    extrude(amount=F10_DEPTH)


with BuildPart() as f8:
    # F7 (on face) → F8 (new body)
    with BuildSketch(Plane.XY.offset(100)):
        Polygon((11.5, 98.5), (1.5, 98.5), (1.5, 88.5), align=None)
        with Locations((4, 96)):
            Circle(F7_R, mode=Mode.SUBTRACT)
    extrude(amount=-F8_DEPTH)


with BuildPart() as f8b:
    # F7 (on face) → F8, piece 2 (new body)
    with BuildSketch(Plane.XY.offset(100)):
        Polygon((98.5, 98.5), (88.5, 98.5), (98.5, 88.5), align=None)
        with Locations((96, 96)):
            Circle(F7_R, mode=Mode.SUBTRACT)
    extrude(amount=-F8_DEPTH)


with BuildPart() as f8c:
    # F7 (on face) → F8, piece 3 (new body)
    with BuildSketch(Plane.XY.offset(100)):
        Polygon((98.5, 1.5), (98.5, 11.5), (88.5, 1.5), align=None)
        with Locations((96, 4)):
            Circle(F7_R, mode=Mode.SUBTRACT)
    extrude(amount=-F8_DEPTH)


with BuildPart() as f8d:
    # F7 (on face) → F8, piece 4 (new body)
    with BuildSketch(Plane.XY.offset(100)):
        Polygon((11.5, 1.5), (1.5, 11.5), (1.5, 1.5), align=None)
        with Locations((4, 4)):
            Circle(F7_R, mode=Mode.SUBTRACT)
    extrude(amount=-F8_DEPTH)


with BuildPart() as f9_tool:
    # F8_face (on face) → F9 (new body)
    with BuildSketch(Plane(origin=(5.0318927719, 94.9681072281, 100), x_dir=(1, 0, 0), z_dir=(0, 0, 1))):
        Polygon((6.4681072281, 3.5318927719), (-3.5318927719, 3.5318927719), (-3.5318927719, -6.4681072281), align=None)
        with Locations((-1.0318927719, 1.0318927719)):
            Circle(F8_FACE_R, mode=Mode.SUBTRACT)
        Polygon((93.4681072281, 3.5318927719), (83.4681072281, 3.5318927719), (93.4681072281, -6.4681072281), align=None)
        with Locations((90.9681072281, 1.0318927719)):
            Circle(F8_FACE_R, mode=Mode.SUBTRACT)
        Polygon((93.4681072281, -93.4681072281), (93.4681072281, -83.4681072281), (83.4681072281, -93.4681072281), align=None)
        with Locations((90.9681072281, -90.9681072281)):
            Circle(F8_FACE_R, mode=Mode.SUBTRACT)
        Polygon((6.4681072281, -93.4681072281), (-3.5318927719, -83.4681072281), (-3.5318927719, -93.4681072281), align=None)
        with Locations((-1.0318927719, -90.9681072281)):
            Circle(F8_FACE_R, mode=Mode.SUBTRACT)
    extrude(amount=-F9_DEPTH)


with BuildPart() as f8_1:
    add(f8.part)

    # F9: cut by f9_tool
    add(f9_tool.part, mode=Mode.SUBTRACT)


with BuildPart() as f8b_1:
    add(f8b.part)

    # F9: cut by f9_tool
    add(f9_tool.part, mode=Mode.SUBTRACT)


with BuildPart() as f8c_1:
    add(f8c.part)

    # F9: cut by f9_tool
    add(f9_tool.part, mode=Mode.SUBTRACT)


with BuildPart() as f8d_1:
    add(f8d.part)

    # F9: cut by f9_tool
    add(f9_tool.part, mode=Mode.SUBTRACT)


solid = Compound([f1.part, f8_1.part, f8b_1.part, f8c_1.part, f8d_1.part])
